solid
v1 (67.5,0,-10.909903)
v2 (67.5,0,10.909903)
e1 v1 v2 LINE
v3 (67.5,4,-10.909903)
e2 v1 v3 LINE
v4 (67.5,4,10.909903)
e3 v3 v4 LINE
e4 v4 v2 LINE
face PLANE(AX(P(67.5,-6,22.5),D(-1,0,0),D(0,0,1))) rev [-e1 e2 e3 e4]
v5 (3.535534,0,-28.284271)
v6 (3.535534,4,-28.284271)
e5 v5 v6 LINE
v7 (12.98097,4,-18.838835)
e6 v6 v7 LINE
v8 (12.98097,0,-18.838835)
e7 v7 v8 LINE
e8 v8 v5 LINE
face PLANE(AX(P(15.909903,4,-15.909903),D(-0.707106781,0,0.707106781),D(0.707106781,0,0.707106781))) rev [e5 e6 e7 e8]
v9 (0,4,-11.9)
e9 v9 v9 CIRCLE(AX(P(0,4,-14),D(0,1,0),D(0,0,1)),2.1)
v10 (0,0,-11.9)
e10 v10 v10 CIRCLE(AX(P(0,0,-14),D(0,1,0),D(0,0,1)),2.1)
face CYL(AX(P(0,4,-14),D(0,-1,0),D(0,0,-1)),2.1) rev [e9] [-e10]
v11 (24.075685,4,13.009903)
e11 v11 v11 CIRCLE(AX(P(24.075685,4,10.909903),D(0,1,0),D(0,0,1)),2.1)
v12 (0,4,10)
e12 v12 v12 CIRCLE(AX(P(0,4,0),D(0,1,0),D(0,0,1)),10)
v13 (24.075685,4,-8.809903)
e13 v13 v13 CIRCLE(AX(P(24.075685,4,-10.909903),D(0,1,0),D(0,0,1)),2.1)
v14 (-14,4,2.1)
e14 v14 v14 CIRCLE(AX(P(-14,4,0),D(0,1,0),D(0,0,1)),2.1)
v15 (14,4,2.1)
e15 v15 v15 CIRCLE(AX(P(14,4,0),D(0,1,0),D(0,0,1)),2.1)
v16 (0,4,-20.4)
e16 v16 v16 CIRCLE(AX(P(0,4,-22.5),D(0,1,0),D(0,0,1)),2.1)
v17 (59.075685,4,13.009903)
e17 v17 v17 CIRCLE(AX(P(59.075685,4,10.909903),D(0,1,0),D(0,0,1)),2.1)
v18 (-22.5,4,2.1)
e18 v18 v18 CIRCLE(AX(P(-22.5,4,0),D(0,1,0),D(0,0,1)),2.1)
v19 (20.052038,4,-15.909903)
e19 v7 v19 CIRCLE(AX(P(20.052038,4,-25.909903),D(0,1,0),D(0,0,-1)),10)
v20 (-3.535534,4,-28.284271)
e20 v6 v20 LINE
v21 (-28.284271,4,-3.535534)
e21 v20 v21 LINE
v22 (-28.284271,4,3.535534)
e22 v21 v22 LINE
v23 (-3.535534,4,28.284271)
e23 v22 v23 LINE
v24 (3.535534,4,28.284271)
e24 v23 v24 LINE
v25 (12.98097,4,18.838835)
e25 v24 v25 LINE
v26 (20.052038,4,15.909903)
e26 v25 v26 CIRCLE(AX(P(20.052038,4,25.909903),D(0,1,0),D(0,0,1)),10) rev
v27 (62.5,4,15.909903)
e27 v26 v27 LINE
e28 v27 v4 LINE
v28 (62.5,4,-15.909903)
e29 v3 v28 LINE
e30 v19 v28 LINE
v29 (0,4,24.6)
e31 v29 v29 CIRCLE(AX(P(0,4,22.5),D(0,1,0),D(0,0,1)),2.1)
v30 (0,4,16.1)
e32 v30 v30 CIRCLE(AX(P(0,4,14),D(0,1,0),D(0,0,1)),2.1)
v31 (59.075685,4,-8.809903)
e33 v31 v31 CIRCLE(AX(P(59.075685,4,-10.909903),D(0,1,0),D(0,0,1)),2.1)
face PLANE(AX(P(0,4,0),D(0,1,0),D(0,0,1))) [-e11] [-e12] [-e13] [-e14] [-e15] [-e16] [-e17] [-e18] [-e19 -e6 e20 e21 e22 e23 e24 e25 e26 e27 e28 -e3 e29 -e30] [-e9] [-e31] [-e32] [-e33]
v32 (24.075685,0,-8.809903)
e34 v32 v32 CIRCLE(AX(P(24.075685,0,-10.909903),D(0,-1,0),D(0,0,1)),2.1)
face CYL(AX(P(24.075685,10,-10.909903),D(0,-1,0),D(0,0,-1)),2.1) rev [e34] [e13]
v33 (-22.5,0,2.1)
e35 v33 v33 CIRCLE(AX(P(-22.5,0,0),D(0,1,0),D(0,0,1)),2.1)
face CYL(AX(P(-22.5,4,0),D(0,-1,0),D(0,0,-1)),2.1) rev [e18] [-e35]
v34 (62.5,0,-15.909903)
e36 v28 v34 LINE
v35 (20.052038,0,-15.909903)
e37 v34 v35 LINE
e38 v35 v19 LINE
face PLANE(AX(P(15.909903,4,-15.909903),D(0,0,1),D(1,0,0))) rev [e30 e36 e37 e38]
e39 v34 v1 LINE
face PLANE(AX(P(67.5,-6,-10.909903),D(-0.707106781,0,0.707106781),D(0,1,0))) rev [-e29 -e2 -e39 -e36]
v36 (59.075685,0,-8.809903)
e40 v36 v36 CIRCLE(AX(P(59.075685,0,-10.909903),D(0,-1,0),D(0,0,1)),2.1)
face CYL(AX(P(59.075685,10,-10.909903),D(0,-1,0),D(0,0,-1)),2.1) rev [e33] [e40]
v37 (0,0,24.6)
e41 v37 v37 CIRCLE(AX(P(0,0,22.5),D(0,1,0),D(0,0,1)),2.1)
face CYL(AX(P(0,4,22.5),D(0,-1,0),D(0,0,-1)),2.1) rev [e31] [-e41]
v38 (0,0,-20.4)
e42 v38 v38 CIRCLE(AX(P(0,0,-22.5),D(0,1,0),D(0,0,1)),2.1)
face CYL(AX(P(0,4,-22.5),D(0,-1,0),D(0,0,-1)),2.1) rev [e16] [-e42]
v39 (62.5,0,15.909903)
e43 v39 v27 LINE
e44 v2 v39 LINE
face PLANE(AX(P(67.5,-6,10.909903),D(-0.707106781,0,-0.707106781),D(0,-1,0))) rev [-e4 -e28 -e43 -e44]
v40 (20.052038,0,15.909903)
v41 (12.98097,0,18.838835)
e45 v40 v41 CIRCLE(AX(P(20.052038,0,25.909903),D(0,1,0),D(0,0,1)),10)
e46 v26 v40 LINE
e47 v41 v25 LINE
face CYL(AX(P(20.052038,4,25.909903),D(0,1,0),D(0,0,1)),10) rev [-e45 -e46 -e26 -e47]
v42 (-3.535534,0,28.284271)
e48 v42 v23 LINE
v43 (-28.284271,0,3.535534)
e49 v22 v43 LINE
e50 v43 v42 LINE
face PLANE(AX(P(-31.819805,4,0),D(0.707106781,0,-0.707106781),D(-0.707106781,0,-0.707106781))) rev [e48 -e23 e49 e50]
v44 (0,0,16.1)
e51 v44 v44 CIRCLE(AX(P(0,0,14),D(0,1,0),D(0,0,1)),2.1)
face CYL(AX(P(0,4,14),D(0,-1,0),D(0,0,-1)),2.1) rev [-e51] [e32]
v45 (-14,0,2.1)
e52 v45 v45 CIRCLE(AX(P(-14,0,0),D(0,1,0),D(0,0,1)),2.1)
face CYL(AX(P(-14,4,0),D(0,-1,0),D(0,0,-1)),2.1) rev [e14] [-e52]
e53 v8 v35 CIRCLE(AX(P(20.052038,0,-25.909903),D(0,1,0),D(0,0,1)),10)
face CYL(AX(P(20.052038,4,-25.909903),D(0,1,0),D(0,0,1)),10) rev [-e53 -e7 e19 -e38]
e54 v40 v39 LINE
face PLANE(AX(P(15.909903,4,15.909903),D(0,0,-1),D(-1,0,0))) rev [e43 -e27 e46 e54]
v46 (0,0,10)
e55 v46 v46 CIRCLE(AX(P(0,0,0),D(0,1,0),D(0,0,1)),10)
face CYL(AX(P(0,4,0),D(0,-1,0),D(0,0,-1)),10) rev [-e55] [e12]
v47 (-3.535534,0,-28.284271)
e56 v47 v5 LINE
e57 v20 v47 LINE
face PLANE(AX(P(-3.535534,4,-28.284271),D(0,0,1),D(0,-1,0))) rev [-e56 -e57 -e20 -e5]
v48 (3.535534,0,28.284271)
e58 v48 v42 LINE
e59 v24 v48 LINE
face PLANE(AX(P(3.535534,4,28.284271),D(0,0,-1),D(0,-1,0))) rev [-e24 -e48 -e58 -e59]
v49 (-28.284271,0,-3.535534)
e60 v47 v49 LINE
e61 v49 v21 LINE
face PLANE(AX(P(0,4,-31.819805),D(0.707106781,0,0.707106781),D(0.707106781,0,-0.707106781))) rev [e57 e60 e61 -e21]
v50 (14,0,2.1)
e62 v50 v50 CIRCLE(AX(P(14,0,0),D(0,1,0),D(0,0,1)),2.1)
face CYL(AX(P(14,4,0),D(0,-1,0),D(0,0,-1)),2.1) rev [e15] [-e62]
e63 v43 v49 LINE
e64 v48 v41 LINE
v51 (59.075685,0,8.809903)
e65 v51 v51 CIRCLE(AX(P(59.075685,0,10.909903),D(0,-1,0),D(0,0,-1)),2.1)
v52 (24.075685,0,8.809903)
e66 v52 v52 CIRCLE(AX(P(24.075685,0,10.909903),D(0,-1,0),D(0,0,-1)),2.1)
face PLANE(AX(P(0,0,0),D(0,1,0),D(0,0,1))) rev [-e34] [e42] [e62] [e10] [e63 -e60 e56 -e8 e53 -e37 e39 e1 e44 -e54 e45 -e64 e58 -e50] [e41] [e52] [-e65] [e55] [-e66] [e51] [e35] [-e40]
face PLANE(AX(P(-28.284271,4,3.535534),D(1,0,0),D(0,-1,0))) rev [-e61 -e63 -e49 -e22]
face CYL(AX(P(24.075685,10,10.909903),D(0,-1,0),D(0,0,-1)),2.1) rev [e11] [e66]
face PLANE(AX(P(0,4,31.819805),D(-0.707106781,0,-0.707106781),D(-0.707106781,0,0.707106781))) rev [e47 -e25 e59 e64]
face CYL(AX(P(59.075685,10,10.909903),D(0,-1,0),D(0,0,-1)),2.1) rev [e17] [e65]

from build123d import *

# Parameters (mm, degrees)
SKETCH_1_R          = 2.1
SKETCH_1_R_2        = 10.5
SKETCH_1_R_3        = 10
EXTRUDE_1_DEPTH     = 4
CHAMFER_1_SIZE      = 5
FILLET_1_R          = 10
SKETCH_2_R          = 2.1
CUT_EXTRUDE_1_DEPTH = 10
EXTRUDE_START       = -3
SKETCH_3_R          = 1.6
EXTRUDE_2_DEPTH     = 3
FILLET_2_R          = 3
FILLET_3_R          = 11
SKETCH_4_R          = 1.6
EXTRUDE_3_DEPTH     = 3
FILLET_4_R          = 10
CHAMFER_2_SIZE      = 2
CHAMFER_2_SIZE2     = 1.851556395
FILLET_5_R          = 10
CUT_EXTRUDE_START   = -10
CUT_EXTRUDE_2_DEPTH = 10
CUT_EXTRUDE_3_DEPTH = 10
CHAMFER_3_SIZE      = 5


with BuildPart() as part:
    # 草图1 → 凸台-拉伸1 (new body)
    with BuildSketch(Plane(origin=(0, 0, 0), x_dir=(1, 0, 0), z_dir=(0, 1, 0))):
        Polygon((0, 31.819805153), (-31.819805153, 0), (0, -31.819805153), (15.909902577, -15.909902577), (67.5, -15.909902577), (67.5, -22.5), (112.5, -22.5), (112.5, 22.5), (67.5, 22.5), (67.5, 15.909902577), (15.909902577, 15.909902577), align=None)
        with Locations(Location((0, 14, 0), (0, 0, 270))):
            Circle(SKETCH_1_R, mode=Mode.SUBTRACT)
        with Locations(Location((14, 0, 0), (0, 0, 270))):
            Circle(SKETCH_1_R, mode=Mode.SUBTRACT)
        with Locations(Location((0, -14, 0), (0, 0, 270))):
            Circle(SKETCH_1_R, mode=Mode.SUBTRACT)
        with Locations(Location((-14, 0, 0), (0, 0, 270))):
            Circle(SKETCH_1_R, mode=Mode.SUBTRACT)
        with Locations(Location((90, 0, 0), (0, 0, 270))):
            Circle(SKETCH_1_R_2, mode=Mode.SUBTRACT)
        with Locations(Location((0, 22.5, 0), (0, 0, 270))):
            Circle(SKETCH_1_R, mode=Mode.SUBTRACT)
        with Locations(Location((0, -22.5, 0), (0, 0, 270))):
            Circle(SKETCH_1_R, mode=Mode.SUBTRACT)
        with Locations(Location((0, 0, 0), (0, 0, 270))):
            Circle(SKETCH_1_R_3, mode=Mode.SUBTRACT)
        with Locations(Location((-22.5, 0, 0), (0, 0, 270))):
            Circle(SKETCH_1_R, mode=Mode.SUBTRACT)
    extrude(amount=EXTRUDE_1_DEPTH)

    # 倒角1
    chamfer_1_edges = [part.edges().sort_by_distance(p)[0] for p in [
        (112.5, 2, -22.5),
        (112.5, 2, 22.5),
        (0, 2, 31.819805153),
        (-31.819805153, 2, 0),
        (0, 2, -31.819805153),
    ]]
    chamfer(chamfer_1_edges, length=CHAMFER_1_SIZE)

    # 圆角1
    # the kernel refuses this fillet: 10 mm, written as the material it adds along each edge
    with BuildSketch(Plane(origin=(15.909902577, 0, -15.909902577), x_dir=(-0.707106781186552, 0, -0.707106781186543), z_dir=(0, 1, 0))) as fillet_1_piece_1:
        with BuildLine():
            CenterArc((FILLET_1_R * 0.414213562373, -FILLET_1_R), FILLET_1_R, 90, 45)
            Line((-FILLET_1_R * 0.292893218813, -FILLET_1_R * 0.292893218813), (-FILLET_1_R * 0.307035354437, -FILLET_1_R * 0.27875108319))
            Line((-FILLET_1_R * 0.307035354437, -FILLET_1_R * 0.27875108319), (-FILLET_1_R * 0.00828427124746, FILLET_1_R * 0.02))
            Line((-FILLET_1_R * 0.00828427124746, FILLET_1_R * 0.02), (FILLET_1_R * 0.414213562373, FILLET_1_R * 0.02))
            Line((FILLET_1_R * 0.414213562373, FILLET_1_R * 0.02), (FILLET_1_R * 0.414213562373, 0))
        make_face()
    extrude(amount=4)
    with BuildSketch(Plane(origin=(15.909902577, 0, 15.909902577), x_dir=(-0.7071067811865422, 0, 0.707106781186553), z_dir=(0, 1, 0))) as fillet_1_piece_2:
        with BuildLine():
            CenterArc((FILLET_1_R * 0.414213562373, FILLET_1_R), FILLET_1_R, 225, 45)
            Line((-FILLET_1_R * 0.292893218813, FILLET_1_R * 0.292893218813), (-FILLET_1_R * 0.307035354437, FILLET_1_R * 0.27875108319))
            Line((-FILLET_1_R * 0.307035354437, FILLET_1_R * 0.27875108319), (-FILLET_1_R * 0.00828427124746, -FILLET_1_R * 0.02))
            Line((-FILLET_1_R * 0.00828427124746, -FILLET_1_R * 0.02), (FILLET_1_R * 0.414213562373, -FILLET_1_R * 0.02))
            Line((FILLET_1_R * 0.414213562373, -FILLET_1_R * 0.02), (FILLET_1_R * 0.414213562373, 0))
        make_face()
    extrude(amount=4)
    with BuildSketch(Plane(origin=(67.5, 0, 15.909902577), x_dir=(-1, 0, 0), z_dir=(0, 1, 0))) as fillet_1_piece_3:
        with BuildLine():
            CenterArc((9.400668296, 10), FILLET_1_R, 199.937217397, 70.062782603)
            Line((0, 6.590097423), (-0.188013366, 6.521899372))
            ThreePointArc((-0.188013366, 6.521899372), (-0.2, 3.295048712), (-0.2, 0))
            Line((-0.2, 0), (0, -0.2))
            Line((0, -0.2), (9.400668296, -0.2))
            Line((9.400668296, -0.2), (9.400668296, 0))
        make_face()
    extrude(amount=4)
    with BuildSketch(Plane(origin=(67.5, 0, -15.909902577), x_dir=(-1, 0, 0), z_dir=(0, 1, 0))) as fillet_1_piece_4:
        with BuildLine():
            CenterArc((9.400668296, -10), FILLET_1_R, 90, 70.062782603)
            Line((0, -6.590097423), (-0.188013366, -6.521899372))
            ThreePointArc((-0.188013366, -6.521899372), (-0.2, -3.295048712), (-0.2, 0))
            Line((-0.2, 0), (0, 0.2))
            Line((0, 0.2), (9.400668296, 0.2))
            Line((9.400668296, 0.2), (9.400668296, 0))
        make_face()
    extrude(amount=4)

    # 草图2 → 切除-拉伸1 (cut)
    with BuildSketch(Plane.XZ):
        with Locations(Location((106.464466094, 16.464466094, 0), (0, 0, 270))):
            Circle(SKETCH_2_R)
        with Locations(Location((106.464466094, -16.464466094, 0), (0, 0, 270))):
            Circle(SKETCH_2_R)
        with Locations(Location((73.535533906, -16.464466094, 0), (0, 0, 90))):
            Circle(SKETCH_2_R)
        with Locations(Location((73.535533906, 16.464466094, 0), (0, 0, 90))):
            Circle(SKETCH_2_R)
        with Locations(Location((24.075684952, 10.909902577, 0), (0, 0, 270))):
            Circle(SKETCH_2_R)
        with Locations(Location((59.075684952, 10.909902577, 0), (0, 0, 270))):
            Circle(SKETCH_2_R)
        with Locations(Location((59.075684952, -10.909902577, 0), (0, 0, 90))):
            Circle(SKETCH_2_R)
        with Locations(Location((24.075684952, -10.909902577, 0), (0, 0, 90))):
            Circle(SKETCH_2_R)
    extrude(amount=-CUT_EXTRUDE_1_DEPTH, mode=Mode.SUBTRACT)

    # 草图3 → 凸台-拉伸2 (add)
    with BuildSketch(Plane(origin=(0, 4, 0), x_dir=(1, 0, 0), z_dir=(0, 1, 0)).offset(EXTRUDE_START)):
        with BuildLine():
            Line((3.535533906, 28.284271247), (40.057636417, 81.344203773))
            ThreePointArc((40.057636417, 81.344203773), (45.94930127, 83.86671265), (50.75784592, 79.629654221))
            Line((50.75784592, 79.629654221), (67.5, 22.5))
            ThreePointArc((67.5, 22.5), (63.839583189, 17.721525883), (58.099331704, 15.909902577))
            Line((58.099331704, 15.909902577), (20.0520382, 15.909902577))
            ThreePointArc((20.0520382, 15.909902577), (16.225203877, 16.671107252), (12.980970389, 18.838834765))
            Line((12.980970389, 18.838834765), (3.535533906, 28.284271247))
        make_face()
        with Locations(Location((45, 77.942286341, 0), (0, 0, 270))):
            Circle(SKETCH_3_R, mode=Mode.SUBTRACT)
        Polygon((16.491758356, 29.470182421), (43.526560522, 68.746803428), (56.080145943, 25.909902577), (20.0520382, 25.909902577), align=None, mode=Mode.SUBTRACT)
    extrude(amount=EXTRUDE_2_DEPTH)

    # 圆角2
    fillet_2_edges = [part.edges().sort_by_distance(p)[0] for p in [
        (16.491758356, 2.5, -29.470182421),
        (43.526560522, 2.5, -68.746803428),
        (56.080145943, 2.5, -25.909902577),
        (20.0520382, 2.5, -25.909902577),
    ]]
    fillet(fillet_2_edges, radius=FILLET_2_R)

    # 圆角3
    fillet_3_edges = [part.edges().sort_by_distance(p)[0] for p in [
        (3.535533906, 2.5, -28.284271247),
        (67.5, 2.5, -22.5),
    ]]
    fillet(fillet_3_edges, radius=FILLET_3_R)

    # 草图4 → 凸台-拉伸3 (add)
    with BuildSketch(Plane(origin=(0, 4, 0), x_dir=(1, 0, 0), z_dir=(0, 1, 0)).offset(EXTRUDE_START)):
        with BuildLine():
            Line((45.94930127, 83.86671265), (81.347717681, 83.86671265))
            Line((81.347717681, 83.86671265), (107.5, 22.5))
            Line((107.5, 22.5), (97.716806526, 22.5))
            Line((97.716806526, 22.5), (75.4, 74.86671265))
            Line((75.4, 74.86671265), (52.153651701, 74.86671265))
            Line((52.153651701, 74.86671265), (50.75784592, 79.629654221))
            ThreePointArc((50.75784592, 79.629654221), (48.966689034, 82.443994695), (45.94930127, 83.86671265))
        make_face()
        with Locations(Location((78, 77.942286341, 0), (0, 0, 270))):
            Circle(SKETCH_4_R, mode=Mode.SUBTRACT)
    extrude(amount=EXTRUDE_3_DEPTH)

    # 圆角4
    fillet_4_edges = [part.edges().sort_by_distance(p)[0] for p in [
        (97.716806526, 2.5, -22.5),
        (75.4, 2.5, -74.86671265),
        (52.153651701, 2.5, -74.86671265),
    ]]
    fillet(fillet_4_edges, radius=FILLET_4_R)

    # 倒角2
    chamfer_2_edges = [part.edges().sort_by_distance(p)[0] for p in [
        (81.347717681, 2.5, -83.86671265),
    ]]
    chamfer_2_side = [part.faces().sort_by_distance(p)[0] for p in [
        (63.648509476, 2.5, -83.86671265),
    ]]
    chamfer(chamfer_2_edges, length=CHAMFER_2_SIZE, length2=CHAMFER_2_SIZE2, reference=chamfer_2_side[0])

    # 圆角5
    fillet_5_edges = [part.edges().sort_by_distance(p)[0] for p in [
        (107.5, 2.5, -22.5),
    ]]
    fillet(fillet_5_edges, radius=FILLET_5_R)

    # 草图5 → 切除-拉伸2 (cut)
    with BuildSketch(Plane(origin=(0, 4, 0), x_dir=(1, 0, 0), z_dir=(0, 1, 0)).offset(CUT_EXTRUDE_START)):
        with BuildLine():
            Line((67.5, -22.5), (67.5, -34.552858439))
            Line((67.5, -34.552858439), (139.474887753, -46.263885721))
            Line((139.474887753, -46.263885721), (130.519396302, 71.535271055))
            Line((130.519396302, 71.535271055), (50.264415224, 107.357236858))
            Line((50.264415224, 107.357236858), (-15.814227001, 52.524784707))
            Line((-15.814227001, 52.524784707), (-3.535533906, 28.284271247))
            Line((-3.535533906, 28.284271247), (3.535533906, 28.284271247))
            Line((3.535533906, 28.284271247), (12.980970389, 18.838834765))
            ThreePointArc((12.980970389, 18.838834765), (16.225203877, 16.671107252), (20.0520382, 15.909902577))
            Line((20.0520382, 15.909902577), (58.099331704, 15.909902577))
            ThreePointArc((58.099331704, 15.909902577), (63.839583189, 17.721525883), (67.5, 22.5))
            Line((67.5, 22.5), (67.5, -22.5))
        make_face()
    extrude(amount=CUT_EXTRUDE_2_DEPTH, mode=Mode.SUBTRACT)

    # 草图6 → 切除-拉伸3 (cut)
    with BuildSketch(Plane(origin=(0, 4, 0), x_dir=(1, 0, 0), z_dir=(0, 1, 0))):
        Polygon((58.099331704, 15.909902577), (80.044473587, 15.909902577), (76.388599313, 31.9888999), (52.293064323, 28.831553936), align=None)
        Polygon((58.099331704, -15.909902577), (78.21653645, -15.909902577), (69.071902646, -30.327138866), (59.799179703, -28.451958172), align=None)
    extrude(amount=-CUT_EXTRUDE_3_DEPTH, mode=Mode.SUBTRACT)

    # 倒角3
    chamfer_3_edges = [part.edges().sort_by_distance(p)[0] for p in [
        (67.5, 2, -15.909902577),
        (67.5, 2, 15.909902577),
    ]]
    chamfer(chamfer_3_edges, length=CHAMFER_3_SIZE)


solid = part.part
